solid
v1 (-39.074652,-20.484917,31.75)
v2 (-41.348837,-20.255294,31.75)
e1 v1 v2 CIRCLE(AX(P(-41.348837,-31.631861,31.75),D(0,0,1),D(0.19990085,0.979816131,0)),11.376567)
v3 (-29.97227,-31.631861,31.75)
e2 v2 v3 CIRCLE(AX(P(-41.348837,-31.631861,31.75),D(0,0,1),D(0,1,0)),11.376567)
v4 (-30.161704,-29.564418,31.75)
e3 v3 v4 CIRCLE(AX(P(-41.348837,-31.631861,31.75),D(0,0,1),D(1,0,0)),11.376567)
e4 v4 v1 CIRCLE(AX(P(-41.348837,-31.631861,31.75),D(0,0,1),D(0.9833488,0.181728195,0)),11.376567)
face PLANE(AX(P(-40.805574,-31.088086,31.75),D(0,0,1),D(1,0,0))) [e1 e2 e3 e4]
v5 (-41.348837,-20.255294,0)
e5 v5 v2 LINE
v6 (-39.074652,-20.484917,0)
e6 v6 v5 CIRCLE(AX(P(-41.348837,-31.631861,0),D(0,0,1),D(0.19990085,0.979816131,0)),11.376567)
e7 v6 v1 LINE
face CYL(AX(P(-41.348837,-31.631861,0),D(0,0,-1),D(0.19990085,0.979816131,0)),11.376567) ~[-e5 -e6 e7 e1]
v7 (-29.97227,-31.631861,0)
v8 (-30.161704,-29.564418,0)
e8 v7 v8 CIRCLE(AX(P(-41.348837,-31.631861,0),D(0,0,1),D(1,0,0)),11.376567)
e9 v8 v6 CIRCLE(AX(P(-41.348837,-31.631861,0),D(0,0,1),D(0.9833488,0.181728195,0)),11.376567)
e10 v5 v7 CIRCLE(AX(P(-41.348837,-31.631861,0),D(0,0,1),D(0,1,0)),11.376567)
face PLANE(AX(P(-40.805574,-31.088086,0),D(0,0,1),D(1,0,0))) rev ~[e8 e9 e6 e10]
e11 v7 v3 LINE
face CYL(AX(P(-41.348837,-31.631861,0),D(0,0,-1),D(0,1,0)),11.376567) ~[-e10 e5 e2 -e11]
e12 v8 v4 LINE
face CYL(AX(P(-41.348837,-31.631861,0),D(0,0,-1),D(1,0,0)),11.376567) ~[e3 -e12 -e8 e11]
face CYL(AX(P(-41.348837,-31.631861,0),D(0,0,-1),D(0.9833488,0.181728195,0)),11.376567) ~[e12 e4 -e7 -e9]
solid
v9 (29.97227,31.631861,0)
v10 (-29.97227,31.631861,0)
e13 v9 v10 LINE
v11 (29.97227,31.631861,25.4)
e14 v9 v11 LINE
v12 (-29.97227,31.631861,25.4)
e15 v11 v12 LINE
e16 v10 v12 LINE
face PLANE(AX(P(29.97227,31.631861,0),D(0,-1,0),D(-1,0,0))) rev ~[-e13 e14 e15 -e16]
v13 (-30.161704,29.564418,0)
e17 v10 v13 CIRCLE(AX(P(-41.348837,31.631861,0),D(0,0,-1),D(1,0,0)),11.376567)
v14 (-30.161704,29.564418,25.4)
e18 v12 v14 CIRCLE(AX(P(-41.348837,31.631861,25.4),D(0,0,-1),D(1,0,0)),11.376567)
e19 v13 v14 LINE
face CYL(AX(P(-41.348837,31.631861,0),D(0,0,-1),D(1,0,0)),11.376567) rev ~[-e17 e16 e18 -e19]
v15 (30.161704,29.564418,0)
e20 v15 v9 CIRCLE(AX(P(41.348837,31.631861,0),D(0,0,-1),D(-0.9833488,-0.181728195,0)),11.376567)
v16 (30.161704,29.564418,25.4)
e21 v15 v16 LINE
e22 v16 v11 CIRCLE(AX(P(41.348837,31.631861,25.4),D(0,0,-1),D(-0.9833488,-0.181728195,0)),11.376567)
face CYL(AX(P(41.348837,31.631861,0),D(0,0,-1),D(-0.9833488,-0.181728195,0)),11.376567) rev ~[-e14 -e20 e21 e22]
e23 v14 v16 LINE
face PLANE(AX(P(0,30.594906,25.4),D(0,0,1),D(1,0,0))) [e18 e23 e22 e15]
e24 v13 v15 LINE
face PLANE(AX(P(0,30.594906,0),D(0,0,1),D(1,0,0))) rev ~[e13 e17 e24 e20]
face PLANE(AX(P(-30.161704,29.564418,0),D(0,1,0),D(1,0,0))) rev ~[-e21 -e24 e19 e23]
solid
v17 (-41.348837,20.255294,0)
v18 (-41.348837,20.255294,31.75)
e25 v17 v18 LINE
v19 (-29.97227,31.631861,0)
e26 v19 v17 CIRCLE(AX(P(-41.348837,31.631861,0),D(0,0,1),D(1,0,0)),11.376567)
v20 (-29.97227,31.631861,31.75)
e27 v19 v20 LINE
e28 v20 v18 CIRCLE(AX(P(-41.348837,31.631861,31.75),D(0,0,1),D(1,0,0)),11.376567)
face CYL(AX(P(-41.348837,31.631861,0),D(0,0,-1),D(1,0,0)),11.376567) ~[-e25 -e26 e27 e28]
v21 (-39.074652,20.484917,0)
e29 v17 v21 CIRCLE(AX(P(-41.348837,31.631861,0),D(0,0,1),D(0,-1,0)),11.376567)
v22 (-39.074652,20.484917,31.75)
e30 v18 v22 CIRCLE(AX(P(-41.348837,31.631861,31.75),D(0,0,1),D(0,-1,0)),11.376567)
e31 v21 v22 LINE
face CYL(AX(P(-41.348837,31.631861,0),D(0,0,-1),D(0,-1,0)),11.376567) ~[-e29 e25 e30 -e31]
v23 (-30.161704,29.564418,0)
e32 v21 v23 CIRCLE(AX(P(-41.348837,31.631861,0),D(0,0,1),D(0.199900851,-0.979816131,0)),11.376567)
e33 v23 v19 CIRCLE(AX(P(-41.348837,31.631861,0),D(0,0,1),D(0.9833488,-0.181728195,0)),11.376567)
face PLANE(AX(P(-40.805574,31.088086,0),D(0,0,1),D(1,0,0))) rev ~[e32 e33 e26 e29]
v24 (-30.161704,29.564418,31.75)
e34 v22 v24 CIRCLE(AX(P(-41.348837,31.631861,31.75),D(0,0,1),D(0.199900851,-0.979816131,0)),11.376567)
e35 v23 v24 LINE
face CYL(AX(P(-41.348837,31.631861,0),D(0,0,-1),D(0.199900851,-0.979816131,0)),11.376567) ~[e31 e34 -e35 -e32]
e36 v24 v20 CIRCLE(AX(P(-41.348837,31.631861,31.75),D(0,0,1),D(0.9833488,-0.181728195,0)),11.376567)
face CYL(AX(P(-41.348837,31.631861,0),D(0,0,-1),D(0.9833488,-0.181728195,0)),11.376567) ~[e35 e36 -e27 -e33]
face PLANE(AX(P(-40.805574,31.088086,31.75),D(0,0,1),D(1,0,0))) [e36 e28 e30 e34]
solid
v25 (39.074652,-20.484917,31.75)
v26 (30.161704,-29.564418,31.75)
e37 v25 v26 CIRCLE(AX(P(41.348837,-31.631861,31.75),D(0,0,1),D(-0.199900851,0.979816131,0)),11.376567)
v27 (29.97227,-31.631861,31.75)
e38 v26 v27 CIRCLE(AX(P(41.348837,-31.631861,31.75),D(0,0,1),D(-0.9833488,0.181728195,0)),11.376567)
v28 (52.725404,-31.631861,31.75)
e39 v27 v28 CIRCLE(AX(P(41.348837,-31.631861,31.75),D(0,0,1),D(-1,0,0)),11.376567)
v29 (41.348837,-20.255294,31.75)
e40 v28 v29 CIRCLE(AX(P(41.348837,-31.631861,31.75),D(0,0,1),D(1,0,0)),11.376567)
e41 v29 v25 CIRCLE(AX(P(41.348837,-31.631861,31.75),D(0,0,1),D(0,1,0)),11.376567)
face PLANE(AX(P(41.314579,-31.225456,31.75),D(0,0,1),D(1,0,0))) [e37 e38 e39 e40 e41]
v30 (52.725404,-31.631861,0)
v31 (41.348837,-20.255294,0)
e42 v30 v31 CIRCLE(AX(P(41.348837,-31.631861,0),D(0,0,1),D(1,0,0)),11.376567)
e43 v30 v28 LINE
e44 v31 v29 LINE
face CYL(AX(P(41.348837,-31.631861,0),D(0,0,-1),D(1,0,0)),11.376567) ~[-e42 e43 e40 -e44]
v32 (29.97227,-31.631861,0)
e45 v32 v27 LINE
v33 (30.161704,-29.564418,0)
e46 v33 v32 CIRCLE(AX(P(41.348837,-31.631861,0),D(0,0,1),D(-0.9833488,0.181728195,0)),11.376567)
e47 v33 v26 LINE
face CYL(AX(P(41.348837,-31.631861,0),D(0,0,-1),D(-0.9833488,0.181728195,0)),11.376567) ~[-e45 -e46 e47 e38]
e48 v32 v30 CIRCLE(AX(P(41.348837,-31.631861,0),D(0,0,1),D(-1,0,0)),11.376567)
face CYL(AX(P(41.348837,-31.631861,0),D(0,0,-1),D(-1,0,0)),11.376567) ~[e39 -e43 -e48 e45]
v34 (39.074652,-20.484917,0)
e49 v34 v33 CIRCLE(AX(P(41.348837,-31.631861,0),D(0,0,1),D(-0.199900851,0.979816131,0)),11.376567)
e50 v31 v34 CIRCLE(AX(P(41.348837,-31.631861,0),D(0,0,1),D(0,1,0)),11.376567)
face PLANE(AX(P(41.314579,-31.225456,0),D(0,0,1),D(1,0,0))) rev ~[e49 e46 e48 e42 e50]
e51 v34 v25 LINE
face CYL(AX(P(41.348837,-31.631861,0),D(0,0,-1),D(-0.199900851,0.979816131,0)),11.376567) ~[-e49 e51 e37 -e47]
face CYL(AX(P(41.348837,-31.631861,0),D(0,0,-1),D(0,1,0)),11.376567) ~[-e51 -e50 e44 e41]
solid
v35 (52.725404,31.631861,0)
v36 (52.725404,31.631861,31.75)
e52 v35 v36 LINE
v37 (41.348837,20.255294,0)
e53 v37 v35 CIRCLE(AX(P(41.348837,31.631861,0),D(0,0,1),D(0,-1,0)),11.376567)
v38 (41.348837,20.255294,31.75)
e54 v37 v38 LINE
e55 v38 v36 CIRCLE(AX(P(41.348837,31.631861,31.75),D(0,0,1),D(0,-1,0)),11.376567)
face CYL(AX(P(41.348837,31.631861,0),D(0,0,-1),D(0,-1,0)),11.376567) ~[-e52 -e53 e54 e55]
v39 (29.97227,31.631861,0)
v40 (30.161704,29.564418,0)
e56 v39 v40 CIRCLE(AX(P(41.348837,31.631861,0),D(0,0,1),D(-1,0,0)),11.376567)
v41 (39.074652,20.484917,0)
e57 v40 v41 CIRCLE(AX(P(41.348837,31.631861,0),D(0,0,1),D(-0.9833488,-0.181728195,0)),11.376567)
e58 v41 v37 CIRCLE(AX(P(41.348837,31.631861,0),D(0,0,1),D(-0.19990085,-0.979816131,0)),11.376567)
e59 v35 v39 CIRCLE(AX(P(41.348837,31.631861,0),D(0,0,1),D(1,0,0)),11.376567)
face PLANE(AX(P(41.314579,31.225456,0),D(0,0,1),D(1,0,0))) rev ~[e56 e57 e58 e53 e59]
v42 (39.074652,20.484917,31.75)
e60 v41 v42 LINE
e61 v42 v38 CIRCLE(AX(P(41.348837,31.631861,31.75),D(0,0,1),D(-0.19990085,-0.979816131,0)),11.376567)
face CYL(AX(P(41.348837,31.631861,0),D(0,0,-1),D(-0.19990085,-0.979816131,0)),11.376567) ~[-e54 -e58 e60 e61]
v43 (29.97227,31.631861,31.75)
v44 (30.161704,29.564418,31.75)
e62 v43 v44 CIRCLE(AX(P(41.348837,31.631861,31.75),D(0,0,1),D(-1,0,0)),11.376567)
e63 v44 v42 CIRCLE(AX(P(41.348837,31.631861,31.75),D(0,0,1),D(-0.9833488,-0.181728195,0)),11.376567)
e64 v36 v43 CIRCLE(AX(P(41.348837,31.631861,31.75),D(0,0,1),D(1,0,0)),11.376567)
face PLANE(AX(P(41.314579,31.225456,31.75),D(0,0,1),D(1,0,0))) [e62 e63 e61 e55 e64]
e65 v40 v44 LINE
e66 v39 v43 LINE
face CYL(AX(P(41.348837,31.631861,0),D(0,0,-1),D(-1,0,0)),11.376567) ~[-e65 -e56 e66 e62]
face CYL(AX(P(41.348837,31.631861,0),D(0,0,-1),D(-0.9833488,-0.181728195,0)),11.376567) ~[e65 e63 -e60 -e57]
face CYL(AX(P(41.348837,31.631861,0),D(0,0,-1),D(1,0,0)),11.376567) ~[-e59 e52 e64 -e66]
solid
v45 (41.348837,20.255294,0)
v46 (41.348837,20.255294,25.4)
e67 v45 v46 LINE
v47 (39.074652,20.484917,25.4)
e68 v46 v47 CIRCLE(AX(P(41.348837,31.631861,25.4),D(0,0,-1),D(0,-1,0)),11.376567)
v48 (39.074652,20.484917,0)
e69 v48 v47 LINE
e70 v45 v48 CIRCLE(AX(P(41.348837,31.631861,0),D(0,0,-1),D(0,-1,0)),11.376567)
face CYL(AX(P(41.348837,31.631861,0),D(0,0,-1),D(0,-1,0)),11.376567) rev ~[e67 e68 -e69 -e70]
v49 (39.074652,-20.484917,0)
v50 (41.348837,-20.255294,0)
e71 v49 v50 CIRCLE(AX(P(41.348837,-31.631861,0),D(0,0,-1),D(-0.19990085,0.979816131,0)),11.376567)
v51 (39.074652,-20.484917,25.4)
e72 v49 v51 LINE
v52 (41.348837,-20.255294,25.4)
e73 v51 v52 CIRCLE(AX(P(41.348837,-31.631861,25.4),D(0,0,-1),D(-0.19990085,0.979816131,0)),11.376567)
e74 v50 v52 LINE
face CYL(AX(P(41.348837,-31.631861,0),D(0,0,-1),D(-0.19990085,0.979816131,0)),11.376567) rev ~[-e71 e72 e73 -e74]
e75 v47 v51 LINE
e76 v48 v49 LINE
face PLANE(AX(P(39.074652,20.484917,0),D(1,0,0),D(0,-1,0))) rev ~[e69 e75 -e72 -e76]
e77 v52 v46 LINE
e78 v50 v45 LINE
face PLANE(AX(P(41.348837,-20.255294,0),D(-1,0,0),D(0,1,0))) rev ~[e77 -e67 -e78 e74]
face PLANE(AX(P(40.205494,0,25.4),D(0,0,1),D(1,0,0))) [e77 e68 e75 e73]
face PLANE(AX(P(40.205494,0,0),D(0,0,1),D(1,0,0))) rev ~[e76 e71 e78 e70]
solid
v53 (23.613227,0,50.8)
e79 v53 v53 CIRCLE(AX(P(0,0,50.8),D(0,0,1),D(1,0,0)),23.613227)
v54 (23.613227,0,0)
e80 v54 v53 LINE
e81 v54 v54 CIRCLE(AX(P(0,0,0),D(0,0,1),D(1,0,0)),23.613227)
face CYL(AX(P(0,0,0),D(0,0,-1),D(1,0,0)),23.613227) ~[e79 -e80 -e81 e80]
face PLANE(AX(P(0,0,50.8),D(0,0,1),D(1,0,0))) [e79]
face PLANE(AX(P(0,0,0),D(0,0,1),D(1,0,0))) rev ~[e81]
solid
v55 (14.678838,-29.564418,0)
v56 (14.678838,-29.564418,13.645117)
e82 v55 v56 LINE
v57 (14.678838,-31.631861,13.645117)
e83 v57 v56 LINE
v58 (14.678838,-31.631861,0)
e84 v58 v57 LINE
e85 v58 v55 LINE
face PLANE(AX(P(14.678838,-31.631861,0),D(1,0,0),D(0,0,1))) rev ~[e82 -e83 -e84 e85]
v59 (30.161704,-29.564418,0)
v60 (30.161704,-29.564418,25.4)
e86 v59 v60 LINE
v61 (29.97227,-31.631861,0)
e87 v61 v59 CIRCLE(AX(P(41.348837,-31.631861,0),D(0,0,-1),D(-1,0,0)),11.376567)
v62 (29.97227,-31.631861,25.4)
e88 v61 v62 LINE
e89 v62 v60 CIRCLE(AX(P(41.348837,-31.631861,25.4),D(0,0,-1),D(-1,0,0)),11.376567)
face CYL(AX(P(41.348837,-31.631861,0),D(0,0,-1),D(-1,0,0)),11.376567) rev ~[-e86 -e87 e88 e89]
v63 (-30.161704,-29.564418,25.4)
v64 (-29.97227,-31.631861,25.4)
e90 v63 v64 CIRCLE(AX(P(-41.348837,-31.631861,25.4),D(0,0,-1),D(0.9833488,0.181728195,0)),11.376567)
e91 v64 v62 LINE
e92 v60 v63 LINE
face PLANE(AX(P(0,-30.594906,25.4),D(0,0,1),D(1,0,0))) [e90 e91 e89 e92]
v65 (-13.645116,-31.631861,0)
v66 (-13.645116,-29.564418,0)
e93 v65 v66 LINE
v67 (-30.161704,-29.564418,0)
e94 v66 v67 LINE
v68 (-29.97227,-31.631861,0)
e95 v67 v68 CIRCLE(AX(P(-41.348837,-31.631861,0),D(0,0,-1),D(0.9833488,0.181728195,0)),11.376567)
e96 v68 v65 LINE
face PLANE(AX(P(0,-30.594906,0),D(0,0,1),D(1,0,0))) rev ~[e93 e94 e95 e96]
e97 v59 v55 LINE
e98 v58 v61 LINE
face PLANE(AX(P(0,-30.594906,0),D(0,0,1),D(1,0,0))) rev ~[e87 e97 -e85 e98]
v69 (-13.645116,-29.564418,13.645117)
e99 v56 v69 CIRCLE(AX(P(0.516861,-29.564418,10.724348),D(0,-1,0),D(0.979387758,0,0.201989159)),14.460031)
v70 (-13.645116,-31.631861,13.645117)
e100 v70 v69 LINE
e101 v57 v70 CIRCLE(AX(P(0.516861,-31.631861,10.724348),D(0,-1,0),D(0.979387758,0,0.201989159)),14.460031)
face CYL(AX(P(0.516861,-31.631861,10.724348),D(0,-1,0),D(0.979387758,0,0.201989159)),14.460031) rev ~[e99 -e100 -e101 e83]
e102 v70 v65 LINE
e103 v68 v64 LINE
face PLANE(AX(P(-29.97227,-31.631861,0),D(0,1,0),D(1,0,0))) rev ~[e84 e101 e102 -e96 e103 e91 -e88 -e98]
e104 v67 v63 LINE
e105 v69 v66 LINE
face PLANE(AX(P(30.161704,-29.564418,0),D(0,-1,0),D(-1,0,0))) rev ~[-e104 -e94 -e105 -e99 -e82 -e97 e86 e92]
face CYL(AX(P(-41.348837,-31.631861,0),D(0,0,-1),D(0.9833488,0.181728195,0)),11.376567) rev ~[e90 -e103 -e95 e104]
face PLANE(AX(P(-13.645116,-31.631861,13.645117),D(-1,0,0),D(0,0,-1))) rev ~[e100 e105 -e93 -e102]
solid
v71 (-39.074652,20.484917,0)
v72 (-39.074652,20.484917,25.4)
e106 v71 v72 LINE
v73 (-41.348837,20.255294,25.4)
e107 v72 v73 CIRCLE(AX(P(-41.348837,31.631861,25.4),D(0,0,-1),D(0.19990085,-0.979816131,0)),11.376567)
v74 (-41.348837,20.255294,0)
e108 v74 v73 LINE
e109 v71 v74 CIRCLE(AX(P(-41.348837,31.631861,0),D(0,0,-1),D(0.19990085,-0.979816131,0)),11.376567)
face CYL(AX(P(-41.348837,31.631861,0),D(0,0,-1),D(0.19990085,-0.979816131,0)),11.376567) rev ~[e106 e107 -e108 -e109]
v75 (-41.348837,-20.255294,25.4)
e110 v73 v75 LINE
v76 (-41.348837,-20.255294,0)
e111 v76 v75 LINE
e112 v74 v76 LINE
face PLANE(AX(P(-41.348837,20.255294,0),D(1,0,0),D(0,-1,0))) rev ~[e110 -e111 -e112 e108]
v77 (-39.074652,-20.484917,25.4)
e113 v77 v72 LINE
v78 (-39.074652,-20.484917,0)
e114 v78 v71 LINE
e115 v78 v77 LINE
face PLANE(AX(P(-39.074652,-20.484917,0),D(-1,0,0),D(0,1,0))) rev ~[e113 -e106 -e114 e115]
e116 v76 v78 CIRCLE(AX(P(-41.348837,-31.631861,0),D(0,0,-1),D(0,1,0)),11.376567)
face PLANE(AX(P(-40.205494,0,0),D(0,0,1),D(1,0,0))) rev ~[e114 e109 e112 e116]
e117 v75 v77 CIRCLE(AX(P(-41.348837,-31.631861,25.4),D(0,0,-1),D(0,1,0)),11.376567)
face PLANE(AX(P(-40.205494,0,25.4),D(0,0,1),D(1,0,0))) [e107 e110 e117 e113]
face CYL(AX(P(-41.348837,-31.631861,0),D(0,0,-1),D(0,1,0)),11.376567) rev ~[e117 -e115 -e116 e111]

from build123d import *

# Parameters (mm, degrees)
F1_DEPTH = 25.4
F2_DEPTH = 31.75
F0_R     = 23.6132270113
F3_DEPTH = 50.8
F5_DEPTH = 41.91


with BuildPart() as f1:
    # F0 (on Top) → F1 (new body)
    with BuildSketch(Plane.XY):
        with BuildLine():
            Line((29.9722703229, 31.631860882), (-29.9722703229, 31.631860882))
            ThreePointArc((-29.9722703229, 31.631860882), (-30.0197276791, 30.5938091569), (-30.161703811, 29.5644178987))
            Line((-30.161703811, 29.5644178987), (30.161703811, 29.5644178987))
            ThreePointArc((30.161703811, 29.5644178987), (30.0197276791, 30.5938091569), (29.9722703229, 31.631860882))
        make_face()
    extrude(amount=F1_DEPTH)


with BuildPart() as f1b:
    # F0 (on Top) → F1, piece 2 (new body)
    with BuildSketch(Plane.XY):
        with BuildLine():
            Line((-41.348837316, 20.2552938889), (-41.348837316, -20.2552938889))
            ThreePointArc((-41.348837316, -20.2552938889), (-40.2059630767, -20.3128452437), (-39.074651897, -20.4849170305))
            Line((-39.074651897, -20.4849170305), (-39.074651897, 20.4849170305))
            ThreePointArc((-39.074651897, 20.4849170305), (-40.2059630767, 20.3128452437), (-41.348837316, 20.2552938889))
        make_face()
    extrude(amount=F1_DEPTH)


with BuildPart() as f1c:
    # F0 (on Top) → F1, piece 3 (new body)
    with BuildSketch(Plane.XY):
        with BuildLine():
            ThreePointArc((-30.161703811, -29.5644178987), (-30.0197276791, -30.5938091569), (-29.9722703229, -31.631860882))
            Line((-29.9722703229, -31.631860882), (29.9722703229, -31.631860882))
            ThreePointArc((29.9722703229, -31.631860882), (30.0197276791, -30.5938091569), (30.161703811, -29.5644178987))
            Line((30.161703811, -29.5644178987), (-30.161703811, -29.5644178987))
        make_face()
    extrude(amount=F1_DEPTH)

    # F4 (on face) → F5 (cut)
    with BuildSketch(Plane.XZ.offset(31.631860882)):
        with BuildLine():
            Line((-13.6451162398, 13.6451171711), (-13.6451162398, 0))
            Line((-13.6451162398, 0), (14.6788377315, 0))
            Line((14.6788377315, 0), (14.6788377315, 13.6451171711))
            ThreePointArc((14.6788377315, 13.6451171711), (0.5168607458, 25.1843783905), (-13.6451162398, 13.6451171711))
        make_face()
    extrude(amount=-F5_DEPTH, mode=Mode.SUBTRACT)


with BuildPart() as f1d:
    # F0 (on Top) → F1, piece 4 (new body)
    with BuildSketch(Plane.XY):
        with BuildLine():
            Line((39.074651897, 20.4849170305), (39.074651897, -20.4849170305))
            ThreePointArc((39.074651897, -20.4849170305), (40.2059630767, -20.3128452437), (41.348837316, -20.2552938889))
            Line((41.348837316, -20.2552938889), (41.348837316, 20.2552938889))
            ThreePointArc((41.348837316, 20.2552938889), (40.2059630767, 20.3128452437), (39.074651897, 20.4849170305))
        make_face()
    extrude(amount=F1_DEPTH)


with BuildPart() as f2:
    # F0 (on Top) → F2 (new body)
    with BuildSketch(Plane.XY):
        with BuildLine():
            ThreePointArc((-29.9722703229, 31.631860882), (-49.3932849835, 39.6763085495), (-41.348837316, 20.2552938889))
            ThreePointArc((-41.348837316, 20.2552938889), (-40.2059630767, 20.3128452437), (-39.074651897, 20.4849170305))
            ThreePointArc((-39.074651897, 20.4849170305), (-33.2302715069, 23.6622206297), (-30.161703811, 29.5644178987))
            ThreePointArc((-30.161703811, 29.5644178987), (-30.0197276791, 30.5938091569), (-29.9722703229, 31.631860882))
        make_face()
    extrude(amount=F2_DEPTH)


with BuildPart() as f2b:
    # F0 (on Top) → F2, piece 2 (new body)
    with BuildSketch(Plane.XY):
        with BuildLine():
            ThreePointArc((-41.348837316, -20.2552938889), (-49.3932849835, -39.6763085495), (-29.9722703229, -31.631860882))
            ThreePointArc((-29.9722703229, -31.631860882), (-30.0197276791, -30.5938091569), (-30.161703811, -29.5644178987))
            ThreePointArc((-30.161703811, -29.5644178987), (-33.2302715069, -23.6622206297), (-39.074651897, -20.4849170305))
            ThreePointArc((-39.074651897, -20.4849170305), (-40.2059630767, -20.3128452437), (-41.348837316, -20.2552938889))
        make_face()
    extrude(amount=F2_DEPTH)


with BuildPart() as f2c:
    # F0 (on Top) → F2, piece 3 (new body)
    with BuildSketch(Plane.XY):
        with BuildLine():
            ThreePointArc((30.161703811, -29.5644178987), (30.0197276791, -30.5938091569), (29.9722703229, -31.631860882))
            ThreePointArc((29.9722703229, -31.631860882), (41.348837316, -43.0084278752), (52.7254043092, -31.631860882))
            ThreePointArc((52.7254043092, -31.631860882), (49.3932849835, -23.5874132146), (41.348837316, -20.2552938889))
            ThreePointArc((41.348837316, -20.2552938889), (40.2059630767, -20.3128452437), (39.074651897, -20.4849170305))
            ThreePointArc((39.074651897, -20.4849170305), (33.2302715069, -23.6622206297), (30.161703811, -29.5644178987))
        make_face()
    extrude(amount=F2_DEPTH)


with BuildPart() as f2d:
    # F0 (on Top) → F2, piece 4 (new body)
    with BuildSketch(Plane.XY):
        with BuildLine():
            ThreePointArc((30.161703811, 29.5644178987), (33.2302715069, 23.6622206297), (39.074651897, 20.4849170305))
            ThreePointArc((39.074651897, 20.4849170305), (40.2059630767, 20.3128452437), (41.348837316, 20.2552938889))
            ThreePointArc((41.348837316, 20.2552938889), (49.3932849835, 23.5874132146), (52.7254043092, 31.631860882))
            ThreePointArc((52.7254043092, 31.631860882), (41.348837316, 43.0084278752), (29.9722703229, 31.631860882))
            ThreePointArc((29.9722703229, 31.631860882), (30.0197276791, 30.5938091569), (30.161703811, 29.5644178987))
        make_face()
    extrude(amount=F2_DEPTH)


with BuildPart() as f3:
    # F0 (on Top) → F3 (new body)
    with BuildSketch(Plane.XY):
        Circle(F0_R)
    extrude(amount=F3_DEPTH)


solid = Compound([f1.part, f1b.part, f1c.part, f1d.part, f2.part, f2b.part, f2c.part, f2d.part, f3.part])
